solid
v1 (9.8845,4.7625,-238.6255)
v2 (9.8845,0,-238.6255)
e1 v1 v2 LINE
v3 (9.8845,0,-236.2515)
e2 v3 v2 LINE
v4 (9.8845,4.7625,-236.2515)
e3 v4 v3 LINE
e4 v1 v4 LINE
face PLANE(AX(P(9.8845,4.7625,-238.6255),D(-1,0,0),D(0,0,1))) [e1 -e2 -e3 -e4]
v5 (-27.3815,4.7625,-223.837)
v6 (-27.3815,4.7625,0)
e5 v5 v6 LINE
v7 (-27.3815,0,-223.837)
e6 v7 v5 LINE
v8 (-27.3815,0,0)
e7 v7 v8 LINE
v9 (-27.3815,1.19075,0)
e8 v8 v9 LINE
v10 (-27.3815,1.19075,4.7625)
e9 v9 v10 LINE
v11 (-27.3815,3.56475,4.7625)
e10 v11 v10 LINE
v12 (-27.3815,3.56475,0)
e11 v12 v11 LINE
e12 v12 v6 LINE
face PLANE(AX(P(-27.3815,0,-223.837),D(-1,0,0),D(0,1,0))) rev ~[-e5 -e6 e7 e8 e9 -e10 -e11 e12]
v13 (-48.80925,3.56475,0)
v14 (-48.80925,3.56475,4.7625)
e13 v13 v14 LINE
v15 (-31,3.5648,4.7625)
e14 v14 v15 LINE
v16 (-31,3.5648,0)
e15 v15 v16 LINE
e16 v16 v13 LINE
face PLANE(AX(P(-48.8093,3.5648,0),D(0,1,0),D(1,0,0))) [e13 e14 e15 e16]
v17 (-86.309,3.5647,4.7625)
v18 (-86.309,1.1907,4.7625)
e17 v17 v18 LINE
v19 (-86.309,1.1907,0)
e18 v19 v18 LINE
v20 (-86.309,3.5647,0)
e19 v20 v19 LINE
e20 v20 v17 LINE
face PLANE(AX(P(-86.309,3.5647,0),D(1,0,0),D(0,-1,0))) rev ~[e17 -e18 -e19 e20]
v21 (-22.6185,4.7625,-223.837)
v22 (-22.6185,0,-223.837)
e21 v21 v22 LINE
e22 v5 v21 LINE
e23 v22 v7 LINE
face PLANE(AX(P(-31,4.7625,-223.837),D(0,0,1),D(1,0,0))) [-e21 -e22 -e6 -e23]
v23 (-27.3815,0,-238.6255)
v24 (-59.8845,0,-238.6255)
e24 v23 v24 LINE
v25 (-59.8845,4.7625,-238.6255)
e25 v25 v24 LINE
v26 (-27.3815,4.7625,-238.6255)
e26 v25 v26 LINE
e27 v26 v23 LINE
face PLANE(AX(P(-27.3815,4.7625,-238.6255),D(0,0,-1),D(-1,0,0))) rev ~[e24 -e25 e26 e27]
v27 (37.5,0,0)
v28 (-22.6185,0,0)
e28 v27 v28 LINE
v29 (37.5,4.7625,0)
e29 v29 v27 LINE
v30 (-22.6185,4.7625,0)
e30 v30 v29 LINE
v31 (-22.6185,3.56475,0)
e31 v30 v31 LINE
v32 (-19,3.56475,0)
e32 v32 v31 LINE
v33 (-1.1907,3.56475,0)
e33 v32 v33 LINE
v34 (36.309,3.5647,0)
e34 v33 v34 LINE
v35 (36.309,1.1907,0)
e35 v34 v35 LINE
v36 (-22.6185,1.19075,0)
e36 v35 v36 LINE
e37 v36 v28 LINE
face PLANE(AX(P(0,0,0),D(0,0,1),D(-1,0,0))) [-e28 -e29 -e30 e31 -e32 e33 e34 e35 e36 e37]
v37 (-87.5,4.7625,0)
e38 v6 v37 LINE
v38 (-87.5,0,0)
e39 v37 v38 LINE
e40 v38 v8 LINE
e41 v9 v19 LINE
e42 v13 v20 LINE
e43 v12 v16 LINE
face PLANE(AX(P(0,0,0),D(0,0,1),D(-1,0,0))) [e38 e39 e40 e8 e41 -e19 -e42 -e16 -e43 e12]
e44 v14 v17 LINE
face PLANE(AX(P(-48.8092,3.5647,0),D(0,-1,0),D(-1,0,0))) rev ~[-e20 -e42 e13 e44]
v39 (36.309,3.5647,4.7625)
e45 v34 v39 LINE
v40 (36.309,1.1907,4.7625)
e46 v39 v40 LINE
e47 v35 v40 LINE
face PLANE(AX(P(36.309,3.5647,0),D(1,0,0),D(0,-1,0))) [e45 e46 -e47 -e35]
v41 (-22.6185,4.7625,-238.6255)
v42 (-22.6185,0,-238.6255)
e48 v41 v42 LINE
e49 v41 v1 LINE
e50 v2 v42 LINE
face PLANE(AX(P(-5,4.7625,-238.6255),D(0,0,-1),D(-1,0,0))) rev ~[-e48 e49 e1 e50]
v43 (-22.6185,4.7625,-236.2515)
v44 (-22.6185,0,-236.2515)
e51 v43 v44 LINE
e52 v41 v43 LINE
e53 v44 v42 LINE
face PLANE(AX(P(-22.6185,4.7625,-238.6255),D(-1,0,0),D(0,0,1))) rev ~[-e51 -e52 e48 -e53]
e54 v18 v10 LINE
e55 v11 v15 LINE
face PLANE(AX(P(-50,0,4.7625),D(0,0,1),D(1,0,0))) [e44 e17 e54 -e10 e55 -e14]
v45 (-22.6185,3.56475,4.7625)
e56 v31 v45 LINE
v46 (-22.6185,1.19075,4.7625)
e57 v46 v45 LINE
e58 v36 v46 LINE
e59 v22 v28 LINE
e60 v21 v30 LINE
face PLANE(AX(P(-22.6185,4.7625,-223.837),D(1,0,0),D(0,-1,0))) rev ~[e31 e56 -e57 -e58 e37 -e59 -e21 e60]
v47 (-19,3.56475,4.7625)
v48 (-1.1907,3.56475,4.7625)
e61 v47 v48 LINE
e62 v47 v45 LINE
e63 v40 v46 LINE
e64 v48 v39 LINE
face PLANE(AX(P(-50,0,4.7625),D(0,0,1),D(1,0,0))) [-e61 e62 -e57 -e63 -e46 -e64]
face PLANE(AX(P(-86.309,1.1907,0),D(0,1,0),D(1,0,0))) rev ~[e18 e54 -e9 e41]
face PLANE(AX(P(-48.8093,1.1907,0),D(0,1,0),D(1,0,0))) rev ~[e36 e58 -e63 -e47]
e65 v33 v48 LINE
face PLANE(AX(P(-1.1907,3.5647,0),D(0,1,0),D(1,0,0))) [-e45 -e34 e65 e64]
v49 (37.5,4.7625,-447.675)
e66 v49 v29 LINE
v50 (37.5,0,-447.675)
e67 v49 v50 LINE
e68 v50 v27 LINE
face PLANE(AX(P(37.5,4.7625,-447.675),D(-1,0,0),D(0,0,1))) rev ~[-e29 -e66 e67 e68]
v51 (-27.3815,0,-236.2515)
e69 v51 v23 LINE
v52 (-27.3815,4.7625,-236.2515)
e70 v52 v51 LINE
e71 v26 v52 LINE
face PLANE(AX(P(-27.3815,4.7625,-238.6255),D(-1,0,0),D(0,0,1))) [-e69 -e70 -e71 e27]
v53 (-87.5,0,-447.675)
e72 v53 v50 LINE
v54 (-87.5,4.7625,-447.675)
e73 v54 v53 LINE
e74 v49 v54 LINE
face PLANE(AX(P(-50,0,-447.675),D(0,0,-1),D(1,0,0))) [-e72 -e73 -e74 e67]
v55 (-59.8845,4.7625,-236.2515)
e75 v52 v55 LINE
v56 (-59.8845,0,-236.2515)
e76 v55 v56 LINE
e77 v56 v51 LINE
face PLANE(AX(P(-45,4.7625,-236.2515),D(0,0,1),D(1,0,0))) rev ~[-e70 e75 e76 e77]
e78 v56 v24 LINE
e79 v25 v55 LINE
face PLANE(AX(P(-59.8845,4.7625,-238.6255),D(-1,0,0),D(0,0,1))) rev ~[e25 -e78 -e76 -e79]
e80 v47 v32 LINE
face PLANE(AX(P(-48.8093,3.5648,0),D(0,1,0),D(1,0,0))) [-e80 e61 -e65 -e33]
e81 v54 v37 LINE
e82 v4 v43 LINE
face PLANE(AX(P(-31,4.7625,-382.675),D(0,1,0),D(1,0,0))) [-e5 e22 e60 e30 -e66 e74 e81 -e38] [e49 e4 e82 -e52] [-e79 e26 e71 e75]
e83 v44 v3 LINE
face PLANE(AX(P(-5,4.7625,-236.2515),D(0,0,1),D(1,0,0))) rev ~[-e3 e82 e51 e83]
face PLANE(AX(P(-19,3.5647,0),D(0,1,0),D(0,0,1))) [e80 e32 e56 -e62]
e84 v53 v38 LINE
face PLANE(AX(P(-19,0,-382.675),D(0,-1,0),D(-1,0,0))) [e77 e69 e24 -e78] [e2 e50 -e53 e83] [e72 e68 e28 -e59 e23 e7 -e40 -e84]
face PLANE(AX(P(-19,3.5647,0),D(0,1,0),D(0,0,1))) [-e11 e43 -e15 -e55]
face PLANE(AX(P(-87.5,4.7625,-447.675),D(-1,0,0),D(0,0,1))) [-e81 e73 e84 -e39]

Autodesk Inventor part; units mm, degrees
ref_plane "YZ Plane" through (0, 0, 0) normal (1, 0, 0) x (0, 1, 0)
ref_plane "XZ Plane" through (0, 0, 0) normal (0, 1, 0) x (-1, 0, 0)
ref_plane "XY Plane" through (0, 0, 0) normal (0, 0, 1) x (1, 0, 0)
sketch "Sketch1" plane through (0, 0, 0) normal (0, 1, 0) x (-1, 0, 0)
  line L0 (0, 0) -> (50, 0)
  line L1 (50, 0) -> (50, -447.675)
  line L2 (50, -447.675) -> (0, -447.675)
  line L3 (0, -447.675) -> (0, 0)
  dimension "d0" = 50
  dimension "d1" = 447.675
extrude "Extrusion1" add sketch "Sketch1" along normal blind 4.7625
sketch "Sketch2" plane through (-50, 0, 0) normal (0, 0, 1) x (1, 0, 0)
  line L0 (1.1907, 3.5648) -> (1.1907, 1.1907)
  line L1 (50, 0) -> (0, 0) projected
  line L2 (50, 4.7625) -> (0, 4.7625) projected
  line L3 (1.1907, 1.1907) -> (48.8093, 1.1907)
  line L4 (1.1907, 3.5648) -> (48.8093, 3.5648)
  line L5 (48.8093, 3.5648) -> (48.8093, 1.1907)
  line L6 (50, 0) -> (50, 4.7625) projected
extrude "Extrusion2" add sketch "Sketch2" along normal blind 4.7625
sketch "Sketch3" plane through (0, 4.7625, 0) normal (0, 1, 0) x (1, 0, 0)
  line L0 (-50, 447.675) -> (-50, 0) projected
  line L1 (-50, 447.675) -> (-25, 447.675)
  line L2 (0, 447.675) -> (-50, 447.675) projected
  line L3 (-25, 447.675) -> (-25, 382.675)
  line L4 (-31, 382.675) -> (-19, 382.675)
  line L5 (-31, 382.675) -> (-31, 0)
  line L6 (-1.1907, 0) -> (-48.8093, 0) projected
  line L7 (-19, 382.675) -> (-19, 0)
  line L8 (-31, 0) -> (-19, 0)
  point P0 (0, 0)
  dimension "d11" = 25
extrude "Extrusion3" cut sketch "Sketch3" against normal blind 10
sketch "Sketch4" plane through (-50, 0, 4.7625) normal (0, 0, 1) x (1, 0, 0)
  line L0 (31, 3.5648) -> (31, 1.1907) projected
  line L1 (31, 1.1907) -> (31, 3.5648)
  line L2 (19, 3.5648) -> (31, 3.5648) projected
  line L3 (31, 3.5648) -> (19, 3.5648)
  line L4 (19, 3.5648) -> (19, 1.1907)
  line L5 (19, 1.1907) -> (31, 1.1907)
  point P0 (50, 0)
extrude "Extrusion4" cut sketch "Sketch4" against normal blind 10
sketch "Sketch5" plane through (0, 4.7625, 0) normal (0, 1, 0) x (1, 0, 0)
  point P0 (0, 0)
sketch "Sketch6" plane through (-31, 4.7625, -382.675) normal (0, 0, 1) x (1, 0, 0)
  line L0 (12, -4.7625) -> (0, -4.7625) projected
  line L1 (12, 0) -> (12, -4.7625) projected
  line L2 (0, 0) -> (12, 0) projected
  line L3 (0, 0) -> (0, -4.7625) projected
  point P0 (31, -4.7625)
extrude "Extrusion5" add sketch "Sketch6" along normal blind 158.838
sketch "Sketch8" plane through (-31, 4.7625, -223.837) normal (0, 0, 1) x (1, 0, 0)
  line L0 (3.6185, -4.7625) -> (3.6185, 0)
  line L1 (3.6185, 0) -> (8.3815, 0)
  line L2 (8.3815, 0) -> (8.3815, -4.7625)
  line L3 (3.6185, -4.7625) -> (8.3815, -4.7625)
  line L4 (0, -4.7625) -> (12, -4.7625) projected
  line L5 (-19, 0) -> (0, 0) projected
  line L6 (0, 0) -> (3.6185, 0)
  line L7 (12, 0) -> (0, 0) projected
  line L8 (3.6185, -4.7625) -> (0, -4.7625)
  line L9 (0, -4.7625) -> (0, 0) projected
  line L10 (0, -4.7625) -> (0, 0)
  line L11 (8.3815, 0) -> (12, 0)
  line L12 (12, -3.5718) -> (12, -4.7625) projected
  line L13 (12, -4.7625) -> (8.3815, -4.7625)
  line L14 (12, -4.7625) -> (12, 0)
  point P0 (31, -4.7625)
  dimension "d25" = 4.763
extrude "Extrusion6" add sketch "Sketch8" along normal blind 223.837 contours L4 L9 L6 L0 | L2 L7 L14 L12 L4
sketch "Sketch9" plane through (-19, 1.1907, 0) normal (-1, 0, 0) x (0, 0, 1)
  line L0 (0, 2.374) -> (0, 0) projected
  line L1 (4.7625, 0) -> (0, 0) projected
  line L2 (4.7625, 2.374) -> (4.7625, 0) projected
  line L3 (0, 2.374) -> (4.7625, 2.374) projected
  point P0 (0, -1.1907)
extrude "Extrusion7" add sketch "Sketch9" along normal blind 15
sketch "Sketch10" plane through (-22.6185, 3.5648, 0) normal (0, 0, -1) x (-1, 0, 0)
  line L0 (4.763, -2.374) -> (4.763, 0) projected
  line L1 (0, 0) -> (4.763, 0) projected
  line L2 (0, 0) -> (0, -2.374) projected
  line L3 (0, -2.374) -> (4.763, -2.374) projected
  point P0 (-22.6185, -3.5648)
extrude "Extrusion8" cut sketch "Sketch10" against normal blind 15
sketch "Sketch14" plane through (0, 4.7625, 0) normal (0, 1, 0) x (1, 0, 0)
  line L0 (0, 447.675) -> (-50, 447.675) projected
  line L1 (0, 0) -> (0, 447.675) projected
  line L2 (-50, 447.675) -> (-50, 0) projected
  line L3 (-27.3815, 223.837) -> (-27.3815, 0) projected
  line L4 (-22.6185, 223.837) -> (-22.6185, 0) projected
  line L5 (-5, 231.488) -> (-22.6185, 231.488)
  line L6 (-22.6185, 231.488) -> (-22.6185, 233.862)
  line L7 (-22.6185, 233.862) -> (-5, 233.862)
  line L8 (-5, 231.488) -> (-5, 233.862)
  line L9 (-27.3815, 223.837) -> (-22.6185, 223.837) projected
  line L10 (-45, 231.488) -> (-27.3815, 231.488)
  line L11 (-27.3815, 231.488) -> (-27.3815, 233.862)
  line L12 (-27.3815, 233.862) -> (-45, 233.862)
  line L13 (-45, 231.488) -> (-45, 233.862)
  dimension "d35" = 2.374
extrude "Extrusion9" cut sketch "Sketch14" against normal blind 10
sketch "Sketch17" plane through (0, 4.7625, 0) normal (0, 1, 0) x (1, 0, 0)
  line L0 (-50, 447.675) -> (-50, 0) projected
  line L1 (-50, 235.0565) -> (0, 235.0565)
  line L2 (0, 0) -> (0, 447.675) projected
  line L3 (-45, 231.488) -> (-45, 233.862) projected
  line L4 (-45, 236.2515) -> (-45, 238.6255)
  line L5 (-45, 238.6255) -> (-27.3815, 238.6255)
  line L6 (-45, 236.2515) -> (-27.3815, 236.2515)
  line L7 (-27.3815, 238.6255) -> (-27.3815, 236.2515)
  line L8 (-5, 236.2515) -> (-5, 238.6255)
  line L9 (-5, 238.6255) -> (-22.6185, 238.6255)
  line L10 (-5, 236.2515) -> (-22.6185, 236.2515)
  line L11 (-22.6185, 238.6255) -> (-22.6185, 236.2515)
  point P0 (-27.3815, 231.488)
  dimension "d43" = 2.374
extrude "Extrusion10" cut sketch "Sketch17" against normal blind 10
sketch "Sketch18" plane through (0, 4.7625, 0) normal (0, 1, 0) x (1, 0, 0)
  line L0 (-45, 233.862) -> (-45, 231.488) projected
  line L1 (-45, 233.862) -> (-45, 231.488)
  line L2 (-27.3815, 233.862) -> (-45, 233.862) projected
  line L3 (-45, 233.862) -> (-27.3815, 233.862)
  line L4 (-27.3815, 233.862) -> (-27.3815, 231.488) projected
  line L5 (-27.3815, 233.862) -> (-27.3815, 231.488)
  line L6 (-27.3815, 231.488) -> (-45, 231.488)
  line L7 (-22.6185, 231.488) -> (-5, 231.488) projected
  line L8 (-5, 231.488) -> (-22.6185, 231.488)
  line L9 (-22.6185, 231.488) -> (-22.6185, 233.862)
  line L10 (-22.6185, 233.862) -> (-5, 233.862)
  line L11 (-5, 231.488) -> (-5, 233.862) projected
  line L12 (-5, 233.862) -> (-5, 231.488)
  point P0 (0, 0)
extrude "Extrusion11" add sketch "Sketch18" against normal up to surface (4.7625 mm away)
sketch "Sketch19" plane through (0, 4.7625, 0) normal (0, 1, 0) x (1, 0, 0)
  line L0 (0, 0) -> (0, 447.675) projected
  line L1 (0, 0) -> (37.5, 0)
  line L2 (0, 447.675) -> (-50, 447.675) projected
  line L3 (0, 447.675) -> (37.5, 447.675)
  line L4 (37.5, 447.675) -> (37.5, 0)
  line L5 (0, 0) -> (0, 447.675)
  line L6 (-50, 0) -> (-50, 447.675)
  line L7 (-50, 0) -> (-87.5, 0)
  line L8 (-50, 447.675) -> (-87.5, 447.675)
  line L9 (-87.5, 447.675) -> (-87.5, 0)
  dimension "d48" = 37.5
  dimension "d49" = 37.5
extrude "Extrusion12" add sketch "Sketch19" against normal up to surface (4.7625 mm away)
sketch "Sketch20" plane through (-1.1907, 1.1907, 0) normal (0, 0, 1) x (1, 0, 0)
  line L0 (37.4997, 0) -> (0, 0)
  line L1 (0, 2.374) -> (0, 0) projected
  line L2 (0, 0) -> (0, 2.374)
  line L3 (0, 2.374) -> (0, 0)
  line L4 (0, 2.374) -> (37.4997, 2.374)
  line L5 (37.4997, 2.374) -> (37.4997, 0)
  line L6 (-26.1908, -1.1907) -> (-21.4278, -1.1907) projected
  line L7 (-21.4278, 3.5718) -> (-26.1908, 3.5718) projected
  line L8 (-85.1183, 0) -> (-47.6185, 0)
  line L9 (-47.6185, 2.374) -> (-47.6185, 0)
  line L10 (-47.6185, 2.374) -> (-85.1183, 2.374)
  line L11 (-85.1183, 2.374) -> (-85.1183, 0)
extrude "Extrusion13" add sketch "Sketch20" along normal up to surface (4.7625 mm away)
sketch "Sketch21" plane through (0, 4.7625, 0) normal (0, 1, 0) x (1, 0, 0)
  line L0 (-22.6185, 236.2515) -> (-5, 236.2515) projected
  line L1 (-22.6185, 236.2515) -> (9.8845, 236.2515)
  line L2 (-22.6185, 238.6255) -> (-22.6185, 236.2515) projected
  line L3 (9.8845, 238.6255) -> (9.8845, 236.2515)
  line L4 (-22.6185, 238.6255) -> (-22.6185, 236.2515)
  line L5 (-27.3815, 223.837) -> (-22.6185, 223.837) projected
  line L6 (-22.6185, 238.6255) -> (9.8845, 238.6255)
  line L7 (-27.3815, 236.2515) -> (-59.8845, 236.2515)
  line L8 (-27.3815, 238.6255) -> (-27.3815, 236.2515)
  line L9 (-59.8845, 238.6255) -> (-59.8845, 236.2515)
  line L10 (-27.3815, 238.6255) -> (-59.8845, 238.6255)
  point P0 (0, 0)
extrude "Extrusion14" cut sketch "Sketch21" against normal blind 10
properties part number "Sustainable Chair_V2 - Leg(A)_2_CPY" material "Foam Board - V3"
